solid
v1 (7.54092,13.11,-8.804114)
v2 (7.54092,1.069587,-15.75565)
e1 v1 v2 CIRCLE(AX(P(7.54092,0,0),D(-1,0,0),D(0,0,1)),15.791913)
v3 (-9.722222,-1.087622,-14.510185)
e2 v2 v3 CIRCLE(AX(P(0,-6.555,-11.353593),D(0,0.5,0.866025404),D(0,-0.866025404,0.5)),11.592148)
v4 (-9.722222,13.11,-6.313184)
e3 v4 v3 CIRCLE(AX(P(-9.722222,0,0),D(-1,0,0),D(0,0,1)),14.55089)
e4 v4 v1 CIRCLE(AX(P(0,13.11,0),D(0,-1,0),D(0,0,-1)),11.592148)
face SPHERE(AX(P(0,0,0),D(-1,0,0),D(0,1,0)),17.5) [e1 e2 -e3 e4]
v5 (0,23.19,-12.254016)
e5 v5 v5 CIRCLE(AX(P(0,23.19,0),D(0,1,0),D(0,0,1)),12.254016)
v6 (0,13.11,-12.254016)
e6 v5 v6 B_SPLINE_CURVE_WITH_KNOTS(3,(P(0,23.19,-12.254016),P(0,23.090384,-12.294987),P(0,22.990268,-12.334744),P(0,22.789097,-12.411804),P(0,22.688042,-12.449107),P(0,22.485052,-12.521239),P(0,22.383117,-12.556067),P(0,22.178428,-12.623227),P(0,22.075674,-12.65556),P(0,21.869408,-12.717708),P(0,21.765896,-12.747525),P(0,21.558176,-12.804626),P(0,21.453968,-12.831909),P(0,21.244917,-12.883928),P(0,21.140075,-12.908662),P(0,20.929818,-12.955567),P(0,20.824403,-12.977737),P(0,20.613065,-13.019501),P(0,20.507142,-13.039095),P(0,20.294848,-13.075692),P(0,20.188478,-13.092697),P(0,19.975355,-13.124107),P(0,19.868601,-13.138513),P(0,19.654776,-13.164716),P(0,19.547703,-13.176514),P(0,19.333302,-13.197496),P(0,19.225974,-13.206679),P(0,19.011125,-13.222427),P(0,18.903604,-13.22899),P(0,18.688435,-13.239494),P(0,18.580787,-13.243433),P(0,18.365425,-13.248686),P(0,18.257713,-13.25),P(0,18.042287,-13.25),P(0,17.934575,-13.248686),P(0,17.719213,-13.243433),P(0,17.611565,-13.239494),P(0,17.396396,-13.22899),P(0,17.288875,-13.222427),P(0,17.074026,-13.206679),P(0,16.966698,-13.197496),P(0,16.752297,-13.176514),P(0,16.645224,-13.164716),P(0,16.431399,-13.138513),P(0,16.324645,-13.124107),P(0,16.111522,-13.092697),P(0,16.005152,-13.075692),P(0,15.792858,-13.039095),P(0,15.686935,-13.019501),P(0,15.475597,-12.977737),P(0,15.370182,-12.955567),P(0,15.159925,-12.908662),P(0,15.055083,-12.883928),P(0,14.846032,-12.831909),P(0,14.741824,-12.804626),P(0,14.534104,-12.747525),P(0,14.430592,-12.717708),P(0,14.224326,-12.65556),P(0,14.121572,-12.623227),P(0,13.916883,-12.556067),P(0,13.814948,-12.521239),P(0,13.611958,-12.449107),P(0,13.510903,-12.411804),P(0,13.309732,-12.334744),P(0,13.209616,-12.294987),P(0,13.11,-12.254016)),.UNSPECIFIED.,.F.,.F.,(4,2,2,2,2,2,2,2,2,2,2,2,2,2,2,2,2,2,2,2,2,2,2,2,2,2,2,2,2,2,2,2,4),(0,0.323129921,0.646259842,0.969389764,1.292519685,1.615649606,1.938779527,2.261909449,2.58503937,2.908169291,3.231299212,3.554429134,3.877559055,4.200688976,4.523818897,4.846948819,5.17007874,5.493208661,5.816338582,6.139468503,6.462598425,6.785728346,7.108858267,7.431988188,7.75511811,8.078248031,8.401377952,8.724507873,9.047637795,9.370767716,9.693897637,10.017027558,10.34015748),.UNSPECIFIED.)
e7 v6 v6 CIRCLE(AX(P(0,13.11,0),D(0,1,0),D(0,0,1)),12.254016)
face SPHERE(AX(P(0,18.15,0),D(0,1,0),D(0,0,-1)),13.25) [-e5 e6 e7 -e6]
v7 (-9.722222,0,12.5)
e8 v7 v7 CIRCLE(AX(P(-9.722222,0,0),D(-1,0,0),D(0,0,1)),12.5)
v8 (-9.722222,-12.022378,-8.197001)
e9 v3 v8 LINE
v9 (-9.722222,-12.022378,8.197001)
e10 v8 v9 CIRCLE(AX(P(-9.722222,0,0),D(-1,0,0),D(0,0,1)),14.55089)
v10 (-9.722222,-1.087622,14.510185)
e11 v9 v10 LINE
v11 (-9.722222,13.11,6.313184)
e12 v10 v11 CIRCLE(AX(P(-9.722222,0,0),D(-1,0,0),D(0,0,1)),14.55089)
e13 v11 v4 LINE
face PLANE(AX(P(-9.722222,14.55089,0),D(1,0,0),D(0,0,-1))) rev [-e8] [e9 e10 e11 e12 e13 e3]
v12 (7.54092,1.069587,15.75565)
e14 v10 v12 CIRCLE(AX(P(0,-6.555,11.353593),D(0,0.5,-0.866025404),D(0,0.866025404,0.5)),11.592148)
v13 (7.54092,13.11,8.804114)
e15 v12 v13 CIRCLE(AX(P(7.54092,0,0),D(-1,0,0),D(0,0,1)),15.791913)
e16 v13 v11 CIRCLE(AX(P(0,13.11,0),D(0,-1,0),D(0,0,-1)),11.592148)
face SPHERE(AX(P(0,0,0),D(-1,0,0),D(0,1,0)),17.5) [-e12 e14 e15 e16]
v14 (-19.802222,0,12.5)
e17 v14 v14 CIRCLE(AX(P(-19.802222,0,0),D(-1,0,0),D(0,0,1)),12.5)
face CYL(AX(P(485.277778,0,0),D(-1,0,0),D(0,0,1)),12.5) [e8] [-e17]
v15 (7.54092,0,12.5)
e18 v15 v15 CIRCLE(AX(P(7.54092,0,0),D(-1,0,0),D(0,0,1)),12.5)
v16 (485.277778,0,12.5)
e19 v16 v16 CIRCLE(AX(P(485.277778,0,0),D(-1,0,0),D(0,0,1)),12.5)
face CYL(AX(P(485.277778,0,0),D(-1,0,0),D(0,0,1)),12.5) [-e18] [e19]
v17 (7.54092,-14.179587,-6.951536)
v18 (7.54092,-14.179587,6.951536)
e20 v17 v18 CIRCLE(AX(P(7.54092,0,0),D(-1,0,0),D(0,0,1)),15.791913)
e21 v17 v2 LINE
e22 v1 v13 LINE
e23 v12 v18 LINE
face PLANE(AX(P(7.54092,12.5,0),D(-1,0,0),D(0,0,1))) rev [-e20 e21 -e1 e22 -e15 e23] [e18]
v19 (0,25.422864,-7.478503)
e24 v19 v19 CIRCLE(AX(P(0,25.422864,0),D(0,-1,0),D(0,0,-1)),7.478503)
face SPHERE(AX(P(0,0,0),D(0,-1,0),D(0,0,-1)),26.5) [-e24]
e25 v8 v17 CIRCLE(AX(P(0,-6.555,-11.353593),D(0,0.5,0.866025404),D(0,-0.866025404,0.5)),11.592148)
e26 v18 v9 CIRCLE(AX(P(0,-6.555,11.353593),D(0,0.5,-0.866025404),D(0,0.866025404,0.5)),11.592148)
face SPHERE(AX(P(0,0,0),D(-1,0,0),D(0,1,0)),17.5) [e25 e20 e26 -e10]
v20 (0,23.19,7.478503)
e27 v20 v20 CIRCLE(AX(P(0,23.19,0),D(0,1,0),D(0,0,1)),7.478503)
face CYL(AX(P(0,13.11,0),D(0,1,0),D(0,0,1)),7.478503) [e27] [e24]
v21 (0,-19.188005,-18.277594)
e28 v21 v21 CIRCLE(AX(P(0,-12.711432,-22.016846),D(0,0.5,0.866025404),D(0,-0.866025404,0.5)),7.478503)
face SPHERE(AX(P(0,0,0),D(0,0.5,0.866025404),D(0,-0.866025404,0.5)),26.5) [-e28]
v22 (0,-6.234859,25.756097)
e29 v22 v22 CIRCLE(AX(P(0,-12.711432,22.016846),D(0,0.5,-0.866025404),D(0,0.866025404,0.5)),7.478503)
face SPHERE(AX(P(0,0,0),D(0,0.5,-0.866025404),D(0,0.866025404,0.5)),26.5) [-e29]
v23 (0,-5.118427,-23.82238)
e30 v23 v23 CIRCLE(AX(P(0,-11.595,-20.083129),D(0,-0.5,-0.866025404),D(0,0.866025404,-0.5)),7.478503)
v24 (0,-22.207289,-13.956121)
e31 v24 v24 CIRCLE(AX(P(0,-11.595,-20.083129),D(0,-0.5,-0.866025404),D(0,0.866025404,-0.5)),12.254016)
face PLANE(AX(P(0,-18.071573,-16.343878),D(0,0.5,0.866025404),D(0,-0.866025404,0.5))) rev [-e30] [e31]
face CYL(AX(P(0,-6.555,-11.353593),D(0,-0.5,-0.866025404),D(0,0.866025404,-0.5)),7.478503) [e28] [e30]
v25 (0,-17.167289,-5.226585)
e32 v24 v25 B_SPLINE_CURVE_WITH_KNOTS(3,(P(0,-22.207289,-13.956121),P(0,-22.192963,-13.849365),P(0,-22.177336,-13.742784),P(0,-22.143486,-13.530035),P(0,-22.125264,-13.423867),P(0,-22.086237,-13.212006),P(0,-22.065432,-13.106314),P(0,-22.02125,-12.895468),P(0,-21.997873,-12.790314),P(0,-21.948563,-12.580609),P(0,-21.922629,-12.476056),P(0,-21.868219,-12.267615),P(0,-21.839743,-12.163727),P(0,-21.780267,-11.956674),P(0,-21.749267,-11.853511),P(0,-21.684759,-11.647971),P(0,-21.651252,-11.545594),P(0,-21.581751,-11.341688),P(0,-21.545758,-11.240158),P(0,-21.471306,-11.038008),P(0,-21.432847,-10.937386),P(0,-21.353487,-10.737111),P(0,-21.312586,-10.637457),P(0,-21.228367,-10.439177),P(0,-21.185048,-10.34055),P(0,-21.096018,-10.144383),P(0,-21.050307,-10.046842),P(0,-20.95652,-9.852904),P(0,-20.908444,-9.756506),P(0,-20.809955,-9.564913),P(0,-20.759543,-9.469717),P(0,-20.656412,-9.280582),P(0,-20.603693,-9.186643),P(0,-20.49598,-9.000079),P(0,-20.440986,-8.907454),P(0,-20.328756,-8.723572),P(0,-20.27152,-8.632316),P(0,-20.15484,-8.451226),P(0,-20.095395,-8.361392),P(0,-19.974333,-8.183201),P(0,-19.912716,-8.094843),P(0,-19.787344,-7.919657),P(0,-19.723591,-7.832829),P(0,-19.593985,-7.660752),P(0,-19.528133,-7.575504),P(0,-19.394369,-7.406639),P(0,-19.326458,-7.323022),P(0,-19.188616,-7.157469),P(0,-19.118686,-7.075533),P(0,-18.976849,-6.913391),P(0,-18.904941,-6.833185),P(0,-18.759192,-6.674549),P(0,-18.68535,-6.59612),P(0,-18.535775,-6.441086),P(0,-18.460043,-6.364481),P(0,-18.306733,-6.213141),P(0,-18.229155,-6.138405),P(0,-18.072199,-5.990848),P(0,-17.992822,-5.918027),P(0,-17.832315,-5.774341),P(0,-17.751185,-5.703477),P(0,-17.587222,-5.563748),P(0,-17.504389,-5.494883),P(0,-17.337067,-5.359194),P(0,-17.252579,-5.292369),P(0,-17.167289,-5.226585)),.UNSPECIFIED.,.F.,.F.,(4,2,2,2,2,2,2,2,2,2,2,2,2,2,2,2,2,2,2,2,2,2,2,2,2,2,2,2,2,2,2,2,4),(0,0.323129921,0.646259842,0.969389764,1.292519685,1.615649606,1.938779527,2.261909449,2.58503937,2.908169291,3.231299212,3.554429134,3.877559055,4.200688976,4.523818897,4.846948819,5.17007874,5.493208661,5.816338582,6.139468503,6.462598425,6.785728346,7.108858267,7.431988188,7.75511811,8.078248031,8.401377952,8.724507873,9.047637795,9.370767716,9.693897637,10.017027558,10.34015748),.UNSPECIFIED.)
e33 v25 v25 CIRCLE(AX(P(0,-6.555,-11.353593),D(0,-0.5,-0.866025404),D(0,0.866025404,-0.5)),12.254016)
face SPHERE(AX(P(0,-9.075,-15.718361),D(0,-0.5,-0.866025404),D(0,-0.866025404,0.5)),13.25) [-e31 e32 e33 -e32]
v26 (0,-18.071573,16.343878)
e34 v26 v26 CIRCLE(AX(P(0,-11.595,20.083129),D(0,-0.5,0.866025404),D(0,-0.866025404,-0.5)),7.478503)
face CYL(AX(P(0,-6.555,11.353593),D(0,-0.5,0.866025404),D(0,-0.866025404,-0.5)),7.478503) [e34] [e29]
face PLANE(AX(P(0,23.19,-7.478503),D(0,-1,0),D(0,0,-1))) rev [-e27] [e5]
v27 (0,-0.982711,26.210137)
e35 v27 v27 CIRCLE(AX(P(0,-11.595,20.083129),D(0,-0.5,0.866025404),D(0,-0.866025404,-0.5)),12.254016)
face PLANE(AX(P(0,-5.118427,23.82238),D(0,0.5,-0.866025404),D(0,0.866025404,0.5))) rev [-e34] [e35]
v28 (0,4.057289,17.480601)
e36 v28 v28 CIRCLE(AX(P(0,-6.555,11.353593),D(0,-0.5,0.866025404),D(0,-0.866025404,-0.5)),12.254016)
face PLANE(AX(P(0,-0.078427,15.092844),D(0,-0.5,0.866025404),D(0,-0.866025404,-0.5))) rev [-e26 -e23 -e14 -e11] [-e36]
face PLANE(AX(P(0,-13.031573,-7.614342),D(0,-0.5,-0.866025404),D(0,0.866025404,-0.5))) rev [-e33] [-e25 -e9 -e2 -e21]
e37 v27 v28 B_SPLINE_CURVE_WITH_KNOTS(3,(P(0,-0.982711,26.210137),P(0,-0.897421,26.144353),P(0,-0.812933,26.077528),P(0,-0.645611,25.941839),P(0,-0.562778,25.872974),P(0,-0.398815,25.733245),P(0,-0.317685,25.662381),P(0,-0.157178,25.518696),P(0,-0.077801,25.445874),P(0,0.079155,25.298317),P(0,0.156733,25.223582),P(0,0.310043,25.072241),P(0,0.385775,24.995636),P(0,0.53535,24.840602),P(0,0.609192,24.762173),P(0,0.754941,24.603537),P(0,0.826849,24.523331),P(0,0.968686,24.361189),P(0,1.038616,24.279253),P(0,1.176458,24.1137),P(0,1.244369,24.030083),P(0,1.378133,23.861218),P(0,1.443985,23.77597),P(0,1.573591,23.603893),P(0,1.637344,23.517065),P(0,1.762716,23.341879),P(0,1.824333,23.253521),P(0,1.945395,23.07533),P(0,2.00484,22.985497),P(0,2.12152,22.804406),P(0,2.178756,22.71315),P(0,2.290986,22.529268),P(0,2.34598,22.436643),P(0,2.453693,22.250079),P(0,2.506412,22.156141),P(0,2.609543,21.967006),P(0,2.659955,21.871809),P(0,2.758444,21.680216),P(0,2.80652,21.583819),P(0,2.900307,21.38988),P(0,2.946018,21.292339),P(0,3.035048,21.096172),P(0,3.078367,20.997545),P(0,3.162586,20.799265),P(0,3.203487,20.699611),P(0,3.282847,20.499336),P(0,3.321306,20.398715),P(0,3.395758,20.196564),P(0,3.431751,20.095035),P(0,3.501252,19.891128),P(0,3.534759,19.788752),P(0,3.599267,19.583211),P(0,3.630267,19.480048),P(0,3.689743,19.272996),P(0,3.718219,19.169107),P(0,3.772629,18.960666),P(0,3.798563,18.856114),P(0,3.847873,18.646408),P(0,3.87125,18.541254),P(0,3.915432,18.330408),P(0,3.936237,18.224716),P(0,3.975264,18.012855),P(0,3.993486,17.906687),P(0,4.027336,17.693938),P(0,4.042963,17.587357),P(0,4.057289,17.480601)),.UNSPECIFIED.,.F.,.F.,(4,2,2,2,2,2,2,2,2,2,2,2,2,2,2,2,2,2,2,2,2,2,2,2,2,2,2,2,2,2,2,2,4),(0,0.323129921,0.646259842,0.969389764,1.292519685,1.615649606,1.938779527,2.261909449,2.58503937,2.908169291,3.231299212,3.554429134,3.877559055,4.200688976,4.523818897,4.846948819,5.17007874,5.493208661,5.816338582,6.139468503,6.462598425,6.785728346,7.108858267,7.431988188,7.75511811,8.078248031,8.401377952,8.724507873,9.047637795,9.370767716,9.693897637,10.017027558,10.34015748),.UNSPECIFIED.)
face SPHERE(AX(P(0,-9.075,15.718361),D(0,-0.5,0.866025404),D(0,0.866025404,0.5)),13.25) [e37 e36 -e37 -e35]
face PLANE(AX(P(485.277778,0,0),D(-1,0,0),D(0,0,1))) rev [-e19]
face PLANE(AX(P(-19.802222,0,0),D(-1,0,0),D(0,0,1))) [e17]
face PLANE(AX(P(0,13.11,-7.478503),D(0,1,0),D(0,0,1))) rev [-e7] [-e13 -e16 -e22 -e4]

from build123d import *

# Parameters (mm, degrees)
CUT_EXTRUDE1_DEPTH       = 31.174758882
BOSS_EXTRUDE1_START      = 13.11
BOSS_EXTRUDE1_OUTLINE_R  = 7.478502705
BOSS_EXTRUDE1_DEPTH      = 10.08
CIRPATTERN1_COUNT        = 3
BOSS_EXTRUDE2_DEPTH      = 10.08
BOSS_EXTRUDE2_DEPTH_BACK = 495
SKETCH6_R                = 12.5


# Read off the part's stored shape, not the designer's step: Boss-Extrude1, Revolve3
with BuildPart() as part:
    # Sketch1 → Revolve1 (revolve)
    with BuildSketch(Plane.XY):
        with BuildLine():
            Line((-9.722222222, 14.550889837), (-9.722222222, 12.5))
            Line((-9.722222222, 12.5), (7.540919832, 12.5))
            Line((7.540919832, 12.5), (7.540919832, 15.791913376))
            ThreePointArc((7.540919832, 15.791913376), (-1.254812689, 17.454954744), (-9.722222222, 14.550889837))
        make_face()
    revolve(axis=Axis((-47.061566383, 0, 0), (1, 0, 0)))

    # Sketch2 → Cut-Extrude1 (cut, symmetric)
    with BuildSketch(Plane(origin=(7.540919832, 0, 0), x_dir=(0, 0, -1), z_dir=(1, 0, 0))):
        Polygon((-17.183661108, 13.11), (20.1337897, 13.11), (18.772985043, 23.764289573), (-17.183661108, 23.764289573), align=None)
    cut_extrude1 = extrude(amount=CUT_EXTRUDE1_DEPTH, both=True, mode=Mode.SUBTRACT)

    # Boss-Extrude1 outline → Boss-Extrude1 (add)
    with BuildSketch(Plane(origin=(0, 0, 0), x_dir=(1, 0, 0), z_dir=(0, 1, 0)).offset(BOSS_EXTRUDE1_START)):
        Circle(BOSS_EXTRUDE1_OUTLINE_R)
    boss_extrude1 = extrude(amount=BOSS_EXTRUDE1_DEPTH)

    # Sketch4 → Revolve2 (revolve)
    with BuildSketch(Plane(origin=(0, 0, 0), x_dir=(0, 0, -1), z_dir=(1, 0, 0)), mode=Mode.PRIVATE) as revolve2_sk:
        with BuildLine():
            Line((7.478502705, 25.422863672), (7.478502705, 23.19))
            Line((7.478502705, 23.19), (0, 23.19))
            Line((0, 23.19), (0, 26.5))
            ThreePointArc((0, 26.5), (3.777837522, 26.229333649), (7.478502705, 25.422863672))
        make_face()
    revolve2 = revolve(revolve2_sk.sketch.rotate(Axis((0, 0, 0), (0, 1, 0)), 180), axis=Axis((0, 0, 0), (0, 1, 0)))

    # Revolve3 outline → Revolve3 (revolve)
    with BuildSketch(Plane.XY):
        with BuildLine():
            Line((7.478502705, 23.190000012), (7.478502705, 13.109999988))
            Line((7.478502705, 13.109999988), (12.254015665, 13.109999994))
            ThreePointArc((12.254015665, 13.109999994), (13.25, 18.15), (12.254015665, 23.190000006))
            Line((12.254015665, 23.190000006), (7.478502705, 23.190000012))
        make_face()
    revolve3 = revolve(axis=Axis((0, 0, 0), (0, 1, 0)))

    # CirPattern1: Cut-Extrude1, Boss-Extrude1, Revolve2, Revolve3 ×3 about axis
    cirpattern1_axis = Axis((0, 0, 0), (1, 0, 0))
    add([cut_extrude1.rotate(cirpattern1_axis, i * 360 / CIRPATTERN1_COUNT) for i in range(1, CIRPATTERN1_COUNT)], mode=Mode.SUBTRACT)
    add([boss_extrude1.rotate(cirpattern1_axis, i * 360 / CIRPATTERN1_COUNT) for i in range(1, CIRPATTERN1_COUNT)])
    add([revolve2.rotate(cirpattern1_axis, i * 360 / CIRPATTERN1_COUNT) for i in range(1, CIRPATTERN1_COUNT)])
    add([revolve3.rotate(cirpattern1_axis, i * 360 / CIRPATTERN1_COUNT) for i in range(1, CIRPATTERN1_COUNT)])

    # Sketch6 → Boss-Extrude2 (add, two sides: drawn at the far end of the back side and taken through both)
    with BuildSketch(Plane.ZY.offset(9.722222222).offset(-BOSS_EXTRUDE2_DEPTH_BACK)):
        Circle(SKETCH6_R)
    extrude(amount=BOSS_EXTRUDE2_DEPTH + BOSS_EXTRUDE2_DEPTH_BACK)


solid = part.part
